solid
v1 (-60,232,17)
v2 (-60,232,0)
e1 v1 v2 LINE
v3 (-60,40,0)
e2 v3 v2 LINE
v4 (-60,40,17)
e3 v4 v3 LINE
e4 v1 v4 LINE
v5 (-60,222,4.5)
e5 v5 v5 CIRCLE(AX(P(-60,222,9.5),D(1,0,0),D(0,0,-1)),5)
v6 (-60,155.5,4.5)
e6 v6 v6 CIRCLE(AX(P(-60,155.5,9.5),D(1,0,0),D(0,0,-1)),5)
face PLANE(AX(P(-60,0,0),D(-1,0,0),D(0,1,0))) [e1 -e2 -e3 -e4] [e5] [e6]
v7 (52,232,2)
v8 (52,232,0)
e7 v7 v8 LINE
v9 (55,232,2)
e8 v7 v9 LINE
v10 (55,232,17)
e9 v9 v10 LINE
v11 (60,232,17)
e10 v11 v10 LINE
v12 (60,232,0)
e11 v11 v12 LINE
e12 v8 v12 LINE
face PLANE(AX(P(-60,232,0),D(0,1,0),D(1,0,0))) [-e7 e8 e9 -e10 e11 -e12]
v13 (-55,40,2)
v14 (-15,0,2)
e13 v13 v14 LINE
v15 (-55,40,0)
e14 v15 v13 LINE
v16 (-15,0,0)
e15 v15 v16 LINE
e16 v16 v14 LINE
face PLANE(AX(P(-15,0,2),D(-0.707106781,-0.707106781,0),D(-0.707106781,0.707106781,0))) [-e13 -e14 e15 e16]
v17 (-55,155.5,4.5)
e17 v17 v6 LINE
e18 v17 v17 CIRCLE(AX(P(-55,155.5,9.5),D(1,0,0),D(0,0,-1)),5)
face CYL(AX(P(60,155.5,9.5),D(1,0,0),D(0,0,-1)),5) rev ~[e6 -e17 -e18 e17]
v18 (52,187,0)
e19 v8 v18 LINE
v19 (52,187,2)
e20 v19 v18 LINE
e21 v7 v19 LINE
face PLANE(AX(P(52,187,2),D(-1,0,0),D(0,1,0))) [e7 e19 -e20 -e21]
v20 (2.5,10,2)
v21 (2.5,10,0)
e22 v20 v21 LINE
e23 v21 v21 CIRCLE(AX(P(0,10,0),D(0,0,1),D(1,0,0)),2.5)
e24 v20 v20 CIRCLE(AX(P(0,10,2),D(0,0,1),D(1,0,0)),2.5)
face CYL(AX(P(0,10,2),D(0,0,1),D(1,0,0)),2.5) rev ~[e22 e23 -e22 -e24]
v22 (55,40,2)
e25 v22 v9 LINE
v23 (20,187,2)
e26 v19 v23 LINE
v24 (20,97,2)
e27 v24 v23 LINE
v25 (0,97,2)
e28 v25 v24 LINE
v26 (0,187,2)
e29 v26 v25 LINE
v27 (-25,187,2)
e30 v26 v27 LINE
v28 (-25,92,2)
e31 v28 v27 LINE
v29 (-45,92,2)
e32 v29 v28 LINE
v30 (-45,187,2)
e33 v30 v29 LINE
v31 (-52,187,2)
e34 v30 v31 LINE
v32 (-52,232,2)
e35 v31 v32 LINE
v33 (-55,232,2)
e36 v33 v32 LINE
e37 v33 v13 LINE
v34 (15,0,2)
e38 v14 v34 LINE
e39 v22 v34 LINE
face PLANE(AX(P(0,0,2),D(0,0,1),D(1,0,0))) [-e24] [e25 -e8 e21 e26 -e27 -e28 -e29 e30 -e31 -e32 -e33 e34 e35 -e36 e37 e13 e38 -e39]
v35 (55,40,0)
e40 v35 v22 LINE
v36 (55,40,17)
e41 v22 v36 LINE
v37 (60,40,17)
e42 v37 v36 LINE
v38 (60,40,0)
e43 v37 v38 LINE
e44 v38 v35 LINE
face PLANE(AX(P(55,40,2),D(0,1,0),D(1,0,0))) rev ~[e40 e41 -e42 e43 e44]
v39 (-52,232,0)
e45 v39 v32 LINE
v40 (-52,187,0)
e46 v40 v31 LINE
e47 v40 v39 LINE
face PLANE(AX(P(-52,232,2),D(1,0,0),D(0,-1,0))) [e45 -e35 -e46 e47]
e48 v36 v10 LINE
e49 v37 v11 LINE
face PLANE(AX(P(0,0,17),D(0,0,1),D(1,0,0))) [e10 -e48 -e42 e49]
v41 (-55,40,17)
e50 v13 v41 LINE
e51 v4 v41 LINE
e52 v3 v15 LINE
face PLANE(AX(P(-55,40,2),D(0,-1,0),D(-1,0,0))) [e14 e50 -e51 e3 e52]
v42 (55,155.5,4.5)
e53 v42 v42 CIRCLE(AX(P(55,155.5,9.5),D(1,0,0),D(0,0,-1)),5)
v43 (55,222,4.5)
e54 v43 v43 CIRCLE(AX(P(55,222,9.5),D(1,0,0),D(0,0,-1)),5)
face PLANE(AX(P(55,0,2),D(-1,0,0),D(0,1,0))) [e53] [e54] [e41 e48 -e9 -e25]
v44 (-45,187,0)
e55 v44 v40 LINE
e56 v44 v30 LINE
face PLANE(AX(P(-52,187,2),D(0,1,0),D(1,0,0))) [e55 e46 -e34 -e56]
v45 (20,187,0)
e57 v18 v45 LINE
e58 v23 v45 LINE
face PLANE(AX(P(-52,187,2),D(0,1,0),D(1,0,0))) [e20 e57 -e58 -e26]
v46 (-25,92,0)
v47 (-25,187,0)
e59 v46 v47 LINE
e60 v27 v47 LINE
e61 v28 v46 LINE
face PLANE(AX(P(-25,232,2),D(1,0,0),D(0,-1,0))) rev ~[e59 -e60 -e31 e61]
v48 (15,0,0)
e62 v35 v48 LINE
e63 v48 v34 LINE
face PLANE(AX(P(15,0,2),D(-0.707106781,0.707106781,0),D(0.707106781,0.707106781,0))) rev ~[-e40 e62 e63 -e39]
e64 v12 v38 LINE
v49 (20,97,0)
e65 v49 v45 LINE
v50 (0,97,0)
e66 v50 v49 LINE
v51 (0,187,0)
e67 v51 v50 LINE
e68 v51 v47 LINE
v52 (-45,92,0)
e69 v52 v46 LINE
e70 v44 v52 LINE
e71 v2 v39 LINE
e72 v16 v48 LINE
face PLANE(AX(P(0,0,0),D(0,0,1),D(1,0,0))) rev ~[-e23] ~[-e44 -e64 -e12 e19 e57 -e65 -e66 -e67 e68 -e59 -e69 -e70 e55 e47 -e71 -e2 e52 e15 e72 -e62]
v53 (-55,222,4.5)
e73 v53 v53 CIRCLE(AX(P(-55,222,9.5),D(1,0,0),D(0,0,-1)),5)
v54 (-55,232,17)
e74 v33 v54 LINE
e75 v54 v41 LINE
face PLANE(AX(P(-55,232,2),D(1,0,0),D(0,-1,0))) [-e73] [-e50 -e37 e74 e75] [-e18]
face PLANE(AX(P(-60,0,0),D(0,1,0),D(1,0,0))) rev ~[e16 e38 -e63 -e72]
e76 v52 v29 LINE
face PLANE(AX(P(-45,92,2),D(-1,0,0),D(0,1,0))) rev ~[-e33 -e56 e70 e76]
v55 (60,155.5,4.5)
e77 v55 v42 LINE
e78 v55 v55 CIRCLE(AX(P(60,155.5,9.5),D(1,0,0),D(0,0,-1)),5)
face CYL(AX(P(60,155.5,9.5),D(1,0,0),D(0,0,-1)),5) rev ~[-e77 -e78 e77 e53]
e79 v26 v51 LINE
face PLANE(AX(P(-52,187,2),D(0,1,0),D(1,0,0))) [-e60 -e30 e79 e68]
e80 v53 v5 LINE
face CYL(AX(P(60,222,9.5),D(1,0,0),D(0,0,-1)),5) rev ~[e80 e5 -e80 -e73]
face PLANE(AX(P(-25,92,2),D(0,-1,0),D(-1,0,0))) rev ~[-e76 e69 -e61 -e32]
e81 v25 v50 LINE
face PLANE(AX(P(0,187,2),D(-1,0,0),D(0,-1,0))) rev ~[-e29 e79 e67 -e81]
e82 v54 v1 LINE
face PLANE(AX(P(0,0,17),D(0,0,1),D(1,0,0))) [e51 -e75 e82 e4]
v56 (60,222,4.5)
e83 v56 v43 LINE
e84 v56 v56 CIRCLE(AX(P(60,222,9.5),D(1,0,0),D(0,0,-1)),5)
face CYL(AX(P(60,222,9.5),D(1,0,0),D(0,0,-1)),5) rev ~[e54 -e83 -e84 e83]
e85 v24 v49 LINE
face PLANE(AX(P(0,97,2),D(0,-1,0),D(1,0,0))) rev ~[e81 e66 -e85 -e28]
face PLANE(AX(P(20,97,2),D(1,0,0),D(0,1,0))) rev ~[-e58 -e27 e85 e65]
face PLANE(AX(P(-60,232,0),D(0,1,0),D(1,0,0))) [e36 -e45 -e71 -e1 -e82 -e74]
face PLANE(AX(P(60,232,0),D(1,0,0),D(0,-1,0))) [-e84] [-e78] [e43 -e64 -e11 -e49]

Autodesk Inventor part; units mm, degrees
ref_plane "YZ Plane" through (0, 0, 0) normal (1, 0, 0) x (0, 1, 0)
ref_plane "XZ Plane" through (0, 0, 0) normal (0, 1, 0) x (-1, 0, 0)
sketch "草图1" plane through (0, 0, 0) normal (0, 0, 1) x (1, 0, 0)
  line L0 (-60, 0) -> (60, 0)
  line L1 (-60, 0) -> (-60, 232)
  line L2 (-60, 232) -> (60, 232)
  line L3 (60, 232) -> (60, 0)
  point P0 (0, 0)
  point P1 (0, 0)
  dimension "宽度" = 120
  dimension "长度" = 232
  dimension "d15" = 120
extrude "拉伸1" add sketch "草图1" along normal blind 2
sketch "草图2" plane through (0, 0, 2) normal (0, 0, 1) x (1, 0, 0)
  line L0 (-60, 0) -> (60, 0) projected
  line L1 (60, 0) -> (60, 232) projected
  line L2 (60, 232) -> (-60, 232) projected
  line L3 (-60, 232) -> (-60, 0) projected
  line L4 (-55, 232) -> (-55, 0)
  line L5 (0, 0) -> (0, 232) construction
  line L6 (55, 0) -> (55, 232)
  dimension "侧厚" = 5
extrude "拉伸2" add sketch "草图2" along normal blind 15 contours L3 L2 L4 L0 | L6 L2 L1 L0
sketch "草图3" plane through (60, 0, 0) normal (1, 0, 0) x (0, 0, -1)
  line L0 (0, 0) -> (0, 232) projected
  line L1 (0, 232) -> (-17, 232) projected
  line L2 (-17, 0) -> (-17, 232) projected
  line L3 (0, 0) -> (-17, 0) projected
  circle A0 centre (-9.5, 222) radius 5
  circle A1 centre (-9.5, 155.5) radius 5
  line L4 (-9.5, 222) -> (-9.5, 155.5) construction
  point P0 (0, 0)
  dimension "d16" = 10
  dimension "后孔位置" = 10
  dimension "上沿" = 7.5
  dimension "d29" = 10
  dimension "d30" = 66.5
extrude "拉伸3" cut sketch "草图3" against normal through all contours A0
sketch "草图4" plane through (0, 0, 2) normal (0, 0, 1) x (1, 0, 0)
  line L0 (-52, 232) -> (-52, 187)
  line L1 (-52, 187) -> (52, 187)
  line L2 (52, 187) -> (52, 232)
  line L3 (55, 232) -> (-55, 232)
  line L4 (0, 232) -> (0, 179.736464)
  line L5 (-52, 232) -> (52, 232)
  line L6 (55, 232) -> (55, 0)
  point P0 (0, 0)
  dimension "d26" = 45
  dimension "d39" = 3
extrude "拉伸4" cut sketch "草图4" along normal through all both and the other way through all
extrude "拉伸5" cut sketch "草图3" against normal through all contours A1
sketch "草图5" plane through (0, 0, 2) normal (0, 0, 1) x (1, 0, 0)
  line L0 (-55, 0) -> (-55, 232) projected
  line L1 (-52, 232) -> (-55, 232) projected
  line L2 (-45, 232) -> (-45, 92)
  line L3 (-25, 232) -> (-25, 92)
  line L4 (-45, 92) -> (-25, 92)
  point P0 (0, 0)
  dimension "d33" = 140
  dimension "d34" = 10
  dimension "d35" = 140
  dimension "d36" = 20
sketch "草图5 outline for 拉伸6" plane through (0, 0, 2) normal (0, 0, 1) x (1, 0, 0)
  line L0 (-45, 232) -> (-25, 232)
  line L1 (-25, 232) -> (-25, 92)
  line L2 (-25, 92) -> (-45, 92)
  line L3 (-45, 92) -> (-45, 232)
extrude "拉伸6" cut sketch "草图5 outline for 拉伸6" along normal through all both and the other way through all
sketch "草图6" plane through (0, 0, 2) normal (0, 0, 1) x (1, 0, 0)
  line L0 (60, 160.5) -> (60, 150.5) projected
  line L1 (55, 150.5) -> (55, 160.5) projected
  line L2 (55, 155.5) -> (0, 155.5) construction
  line L3 (0, 145.5) -> (0, 0) construction
  line L4 (55, 155.5) -> (55, 95.5) construction
  line L5 (55, 95.5) -> (0, 95.5) construction
  line L6 (-10, 95.5) -> (10, 95.5)
  line L7 (52, 187) -> (-25, 187) projected
  line L8 (10, 145.5) -> (10, 177) construction
  line L9 (0, 187) -> (0, 97)
  line L10 (0, 97) -> (20, 97)
  line L11 (20, 97) -> (20, 187)
  dimension "d40" = 60
  dimension "d46" = 90
  dimension "d47" = 20
  dimension "d48" = 10
extrude "拉伸7" cut sketch "草图6" against normal through all
sketch "草图7" plane through (0, 0, 2) normal (0, 0, 1) x (1, 0, 0)
  line L0 (60, 227) -> (60, 217) projected
  line L1 (55, 217) -> (55, 227) projected
  line L2 (-60, 232) -> (-60, 0) projected
  line L3 (60, 0) -> (60, 232) projected
  line L4 (-60, 0) -> (60, 0) projected
  line L5 (55, 222) -> (60, 222) construction
  circle A0 centre (0, 10) radius 2.5
  point P0 (0, 0)
  dimension "d49" = 5
  dimension "d50" = 212
extrude "拉伸8" cut sketch "草图7" against normal through all
sketch "草图8" plane through (0, 0, 2) normal (0, 0, 1) x (1, 0, 0)
  circle A0 centre (0, 10) radius 2.5
  line L0 (20, 187) -> (20, 97)
  line L1 (20, 97) -> (0, 97)
  line L2 (0, 97) -> (0, 187)
  line L3 (0, 187) -> (-25, 187)
  line L4 (-25, 187) -> (-25, 92)
  line L5 (-25, 92) -> (-45, 92)
  line L6 (-45, 92) -> (-45, 187)
  line L7 (-45, 187) -> (-52, 187)
  line L8 (-52, 187) -> (-52, 232)
  line L9 (-52, 232) -> (-55, 232)
  line L10 (-55, 232) -> (-55, 0)
  line L11 (-55, 0) -> (55, 0)
  line L12 (55, 0) -> (55, 232)
  line L13 (55, 232) -> (52, 232)
  line L14 (52, 232) -> (52, 187)
  line L15 (52, 187) -> (20, 187)
  line L16 (-60, 0) -> (-55, 0)
  line L17 (-55, 0) -> (-55, 232)
  line L18 (-55, 232) -> (-60, 232)
  line L19 (-60, 232) -> (-60, 0)
  line L20 (60, 0) -> (60, 232)
  line L21 (60, 232) -> (55, 232)
  line L22 (55, 232) -> (55, 0)
  line L23 (55, 0) -> (60, 0)
  line L24 (-15, 0) -> (-55, 40)
  line L25 (15, 0) -> (55, 40)
  line L26 (0, 0) -> (0, 39.183664) construction
  line L27 (-60, 232) -> (-60, 0)
  line L28 (-55, 40) -> (-60, 40)
  line L29 (-60, 40) -> (-60, 0)
  line L30 (-60, 0) -> (-15, 0)
  line L31 (15, 0) -> (60, 0)
  line L32 (55, 40) -> (60, 40)
  line L33 (60, 0) -> (60, 40)
  dimension "d53" = 30
  dimension "d55" = 40
extrude "拉伸9" cut sketch "草图8" along normal through all both and the other way through all contours L32 L20 L23 L12 | L12 L11 L25 | L11 L10 L24 | L16 L19 L28 L10
ref_plane "工作平面1" through (31, 232, 17) normal (1, 0, 0) x (0, 0, -1)
sketch "草图9" plane through (31, 232, 17) normal (1, 0, 0) x (0, 0, -1)
  line L0 (17, -192) -> (17, 0)
  line L1 (17, -56.209089) -> (-323, -175.94833)
  line L2 (-322.950917, -180.94833) -> (17, -61.209089)
  line L3 (17, -56.209089) -> (17, -61.209089)
  line L4 (-322.950917, -180.94833) -> (-323, -175.94833)
  point P0 (17, -232)
  dimension "d59" = 340
  dimension "d64" = 5
  dimension "d65" = 5
extrude "拉伸11" [suppressed]
properties part number "底板" material "木材(桦木)"
